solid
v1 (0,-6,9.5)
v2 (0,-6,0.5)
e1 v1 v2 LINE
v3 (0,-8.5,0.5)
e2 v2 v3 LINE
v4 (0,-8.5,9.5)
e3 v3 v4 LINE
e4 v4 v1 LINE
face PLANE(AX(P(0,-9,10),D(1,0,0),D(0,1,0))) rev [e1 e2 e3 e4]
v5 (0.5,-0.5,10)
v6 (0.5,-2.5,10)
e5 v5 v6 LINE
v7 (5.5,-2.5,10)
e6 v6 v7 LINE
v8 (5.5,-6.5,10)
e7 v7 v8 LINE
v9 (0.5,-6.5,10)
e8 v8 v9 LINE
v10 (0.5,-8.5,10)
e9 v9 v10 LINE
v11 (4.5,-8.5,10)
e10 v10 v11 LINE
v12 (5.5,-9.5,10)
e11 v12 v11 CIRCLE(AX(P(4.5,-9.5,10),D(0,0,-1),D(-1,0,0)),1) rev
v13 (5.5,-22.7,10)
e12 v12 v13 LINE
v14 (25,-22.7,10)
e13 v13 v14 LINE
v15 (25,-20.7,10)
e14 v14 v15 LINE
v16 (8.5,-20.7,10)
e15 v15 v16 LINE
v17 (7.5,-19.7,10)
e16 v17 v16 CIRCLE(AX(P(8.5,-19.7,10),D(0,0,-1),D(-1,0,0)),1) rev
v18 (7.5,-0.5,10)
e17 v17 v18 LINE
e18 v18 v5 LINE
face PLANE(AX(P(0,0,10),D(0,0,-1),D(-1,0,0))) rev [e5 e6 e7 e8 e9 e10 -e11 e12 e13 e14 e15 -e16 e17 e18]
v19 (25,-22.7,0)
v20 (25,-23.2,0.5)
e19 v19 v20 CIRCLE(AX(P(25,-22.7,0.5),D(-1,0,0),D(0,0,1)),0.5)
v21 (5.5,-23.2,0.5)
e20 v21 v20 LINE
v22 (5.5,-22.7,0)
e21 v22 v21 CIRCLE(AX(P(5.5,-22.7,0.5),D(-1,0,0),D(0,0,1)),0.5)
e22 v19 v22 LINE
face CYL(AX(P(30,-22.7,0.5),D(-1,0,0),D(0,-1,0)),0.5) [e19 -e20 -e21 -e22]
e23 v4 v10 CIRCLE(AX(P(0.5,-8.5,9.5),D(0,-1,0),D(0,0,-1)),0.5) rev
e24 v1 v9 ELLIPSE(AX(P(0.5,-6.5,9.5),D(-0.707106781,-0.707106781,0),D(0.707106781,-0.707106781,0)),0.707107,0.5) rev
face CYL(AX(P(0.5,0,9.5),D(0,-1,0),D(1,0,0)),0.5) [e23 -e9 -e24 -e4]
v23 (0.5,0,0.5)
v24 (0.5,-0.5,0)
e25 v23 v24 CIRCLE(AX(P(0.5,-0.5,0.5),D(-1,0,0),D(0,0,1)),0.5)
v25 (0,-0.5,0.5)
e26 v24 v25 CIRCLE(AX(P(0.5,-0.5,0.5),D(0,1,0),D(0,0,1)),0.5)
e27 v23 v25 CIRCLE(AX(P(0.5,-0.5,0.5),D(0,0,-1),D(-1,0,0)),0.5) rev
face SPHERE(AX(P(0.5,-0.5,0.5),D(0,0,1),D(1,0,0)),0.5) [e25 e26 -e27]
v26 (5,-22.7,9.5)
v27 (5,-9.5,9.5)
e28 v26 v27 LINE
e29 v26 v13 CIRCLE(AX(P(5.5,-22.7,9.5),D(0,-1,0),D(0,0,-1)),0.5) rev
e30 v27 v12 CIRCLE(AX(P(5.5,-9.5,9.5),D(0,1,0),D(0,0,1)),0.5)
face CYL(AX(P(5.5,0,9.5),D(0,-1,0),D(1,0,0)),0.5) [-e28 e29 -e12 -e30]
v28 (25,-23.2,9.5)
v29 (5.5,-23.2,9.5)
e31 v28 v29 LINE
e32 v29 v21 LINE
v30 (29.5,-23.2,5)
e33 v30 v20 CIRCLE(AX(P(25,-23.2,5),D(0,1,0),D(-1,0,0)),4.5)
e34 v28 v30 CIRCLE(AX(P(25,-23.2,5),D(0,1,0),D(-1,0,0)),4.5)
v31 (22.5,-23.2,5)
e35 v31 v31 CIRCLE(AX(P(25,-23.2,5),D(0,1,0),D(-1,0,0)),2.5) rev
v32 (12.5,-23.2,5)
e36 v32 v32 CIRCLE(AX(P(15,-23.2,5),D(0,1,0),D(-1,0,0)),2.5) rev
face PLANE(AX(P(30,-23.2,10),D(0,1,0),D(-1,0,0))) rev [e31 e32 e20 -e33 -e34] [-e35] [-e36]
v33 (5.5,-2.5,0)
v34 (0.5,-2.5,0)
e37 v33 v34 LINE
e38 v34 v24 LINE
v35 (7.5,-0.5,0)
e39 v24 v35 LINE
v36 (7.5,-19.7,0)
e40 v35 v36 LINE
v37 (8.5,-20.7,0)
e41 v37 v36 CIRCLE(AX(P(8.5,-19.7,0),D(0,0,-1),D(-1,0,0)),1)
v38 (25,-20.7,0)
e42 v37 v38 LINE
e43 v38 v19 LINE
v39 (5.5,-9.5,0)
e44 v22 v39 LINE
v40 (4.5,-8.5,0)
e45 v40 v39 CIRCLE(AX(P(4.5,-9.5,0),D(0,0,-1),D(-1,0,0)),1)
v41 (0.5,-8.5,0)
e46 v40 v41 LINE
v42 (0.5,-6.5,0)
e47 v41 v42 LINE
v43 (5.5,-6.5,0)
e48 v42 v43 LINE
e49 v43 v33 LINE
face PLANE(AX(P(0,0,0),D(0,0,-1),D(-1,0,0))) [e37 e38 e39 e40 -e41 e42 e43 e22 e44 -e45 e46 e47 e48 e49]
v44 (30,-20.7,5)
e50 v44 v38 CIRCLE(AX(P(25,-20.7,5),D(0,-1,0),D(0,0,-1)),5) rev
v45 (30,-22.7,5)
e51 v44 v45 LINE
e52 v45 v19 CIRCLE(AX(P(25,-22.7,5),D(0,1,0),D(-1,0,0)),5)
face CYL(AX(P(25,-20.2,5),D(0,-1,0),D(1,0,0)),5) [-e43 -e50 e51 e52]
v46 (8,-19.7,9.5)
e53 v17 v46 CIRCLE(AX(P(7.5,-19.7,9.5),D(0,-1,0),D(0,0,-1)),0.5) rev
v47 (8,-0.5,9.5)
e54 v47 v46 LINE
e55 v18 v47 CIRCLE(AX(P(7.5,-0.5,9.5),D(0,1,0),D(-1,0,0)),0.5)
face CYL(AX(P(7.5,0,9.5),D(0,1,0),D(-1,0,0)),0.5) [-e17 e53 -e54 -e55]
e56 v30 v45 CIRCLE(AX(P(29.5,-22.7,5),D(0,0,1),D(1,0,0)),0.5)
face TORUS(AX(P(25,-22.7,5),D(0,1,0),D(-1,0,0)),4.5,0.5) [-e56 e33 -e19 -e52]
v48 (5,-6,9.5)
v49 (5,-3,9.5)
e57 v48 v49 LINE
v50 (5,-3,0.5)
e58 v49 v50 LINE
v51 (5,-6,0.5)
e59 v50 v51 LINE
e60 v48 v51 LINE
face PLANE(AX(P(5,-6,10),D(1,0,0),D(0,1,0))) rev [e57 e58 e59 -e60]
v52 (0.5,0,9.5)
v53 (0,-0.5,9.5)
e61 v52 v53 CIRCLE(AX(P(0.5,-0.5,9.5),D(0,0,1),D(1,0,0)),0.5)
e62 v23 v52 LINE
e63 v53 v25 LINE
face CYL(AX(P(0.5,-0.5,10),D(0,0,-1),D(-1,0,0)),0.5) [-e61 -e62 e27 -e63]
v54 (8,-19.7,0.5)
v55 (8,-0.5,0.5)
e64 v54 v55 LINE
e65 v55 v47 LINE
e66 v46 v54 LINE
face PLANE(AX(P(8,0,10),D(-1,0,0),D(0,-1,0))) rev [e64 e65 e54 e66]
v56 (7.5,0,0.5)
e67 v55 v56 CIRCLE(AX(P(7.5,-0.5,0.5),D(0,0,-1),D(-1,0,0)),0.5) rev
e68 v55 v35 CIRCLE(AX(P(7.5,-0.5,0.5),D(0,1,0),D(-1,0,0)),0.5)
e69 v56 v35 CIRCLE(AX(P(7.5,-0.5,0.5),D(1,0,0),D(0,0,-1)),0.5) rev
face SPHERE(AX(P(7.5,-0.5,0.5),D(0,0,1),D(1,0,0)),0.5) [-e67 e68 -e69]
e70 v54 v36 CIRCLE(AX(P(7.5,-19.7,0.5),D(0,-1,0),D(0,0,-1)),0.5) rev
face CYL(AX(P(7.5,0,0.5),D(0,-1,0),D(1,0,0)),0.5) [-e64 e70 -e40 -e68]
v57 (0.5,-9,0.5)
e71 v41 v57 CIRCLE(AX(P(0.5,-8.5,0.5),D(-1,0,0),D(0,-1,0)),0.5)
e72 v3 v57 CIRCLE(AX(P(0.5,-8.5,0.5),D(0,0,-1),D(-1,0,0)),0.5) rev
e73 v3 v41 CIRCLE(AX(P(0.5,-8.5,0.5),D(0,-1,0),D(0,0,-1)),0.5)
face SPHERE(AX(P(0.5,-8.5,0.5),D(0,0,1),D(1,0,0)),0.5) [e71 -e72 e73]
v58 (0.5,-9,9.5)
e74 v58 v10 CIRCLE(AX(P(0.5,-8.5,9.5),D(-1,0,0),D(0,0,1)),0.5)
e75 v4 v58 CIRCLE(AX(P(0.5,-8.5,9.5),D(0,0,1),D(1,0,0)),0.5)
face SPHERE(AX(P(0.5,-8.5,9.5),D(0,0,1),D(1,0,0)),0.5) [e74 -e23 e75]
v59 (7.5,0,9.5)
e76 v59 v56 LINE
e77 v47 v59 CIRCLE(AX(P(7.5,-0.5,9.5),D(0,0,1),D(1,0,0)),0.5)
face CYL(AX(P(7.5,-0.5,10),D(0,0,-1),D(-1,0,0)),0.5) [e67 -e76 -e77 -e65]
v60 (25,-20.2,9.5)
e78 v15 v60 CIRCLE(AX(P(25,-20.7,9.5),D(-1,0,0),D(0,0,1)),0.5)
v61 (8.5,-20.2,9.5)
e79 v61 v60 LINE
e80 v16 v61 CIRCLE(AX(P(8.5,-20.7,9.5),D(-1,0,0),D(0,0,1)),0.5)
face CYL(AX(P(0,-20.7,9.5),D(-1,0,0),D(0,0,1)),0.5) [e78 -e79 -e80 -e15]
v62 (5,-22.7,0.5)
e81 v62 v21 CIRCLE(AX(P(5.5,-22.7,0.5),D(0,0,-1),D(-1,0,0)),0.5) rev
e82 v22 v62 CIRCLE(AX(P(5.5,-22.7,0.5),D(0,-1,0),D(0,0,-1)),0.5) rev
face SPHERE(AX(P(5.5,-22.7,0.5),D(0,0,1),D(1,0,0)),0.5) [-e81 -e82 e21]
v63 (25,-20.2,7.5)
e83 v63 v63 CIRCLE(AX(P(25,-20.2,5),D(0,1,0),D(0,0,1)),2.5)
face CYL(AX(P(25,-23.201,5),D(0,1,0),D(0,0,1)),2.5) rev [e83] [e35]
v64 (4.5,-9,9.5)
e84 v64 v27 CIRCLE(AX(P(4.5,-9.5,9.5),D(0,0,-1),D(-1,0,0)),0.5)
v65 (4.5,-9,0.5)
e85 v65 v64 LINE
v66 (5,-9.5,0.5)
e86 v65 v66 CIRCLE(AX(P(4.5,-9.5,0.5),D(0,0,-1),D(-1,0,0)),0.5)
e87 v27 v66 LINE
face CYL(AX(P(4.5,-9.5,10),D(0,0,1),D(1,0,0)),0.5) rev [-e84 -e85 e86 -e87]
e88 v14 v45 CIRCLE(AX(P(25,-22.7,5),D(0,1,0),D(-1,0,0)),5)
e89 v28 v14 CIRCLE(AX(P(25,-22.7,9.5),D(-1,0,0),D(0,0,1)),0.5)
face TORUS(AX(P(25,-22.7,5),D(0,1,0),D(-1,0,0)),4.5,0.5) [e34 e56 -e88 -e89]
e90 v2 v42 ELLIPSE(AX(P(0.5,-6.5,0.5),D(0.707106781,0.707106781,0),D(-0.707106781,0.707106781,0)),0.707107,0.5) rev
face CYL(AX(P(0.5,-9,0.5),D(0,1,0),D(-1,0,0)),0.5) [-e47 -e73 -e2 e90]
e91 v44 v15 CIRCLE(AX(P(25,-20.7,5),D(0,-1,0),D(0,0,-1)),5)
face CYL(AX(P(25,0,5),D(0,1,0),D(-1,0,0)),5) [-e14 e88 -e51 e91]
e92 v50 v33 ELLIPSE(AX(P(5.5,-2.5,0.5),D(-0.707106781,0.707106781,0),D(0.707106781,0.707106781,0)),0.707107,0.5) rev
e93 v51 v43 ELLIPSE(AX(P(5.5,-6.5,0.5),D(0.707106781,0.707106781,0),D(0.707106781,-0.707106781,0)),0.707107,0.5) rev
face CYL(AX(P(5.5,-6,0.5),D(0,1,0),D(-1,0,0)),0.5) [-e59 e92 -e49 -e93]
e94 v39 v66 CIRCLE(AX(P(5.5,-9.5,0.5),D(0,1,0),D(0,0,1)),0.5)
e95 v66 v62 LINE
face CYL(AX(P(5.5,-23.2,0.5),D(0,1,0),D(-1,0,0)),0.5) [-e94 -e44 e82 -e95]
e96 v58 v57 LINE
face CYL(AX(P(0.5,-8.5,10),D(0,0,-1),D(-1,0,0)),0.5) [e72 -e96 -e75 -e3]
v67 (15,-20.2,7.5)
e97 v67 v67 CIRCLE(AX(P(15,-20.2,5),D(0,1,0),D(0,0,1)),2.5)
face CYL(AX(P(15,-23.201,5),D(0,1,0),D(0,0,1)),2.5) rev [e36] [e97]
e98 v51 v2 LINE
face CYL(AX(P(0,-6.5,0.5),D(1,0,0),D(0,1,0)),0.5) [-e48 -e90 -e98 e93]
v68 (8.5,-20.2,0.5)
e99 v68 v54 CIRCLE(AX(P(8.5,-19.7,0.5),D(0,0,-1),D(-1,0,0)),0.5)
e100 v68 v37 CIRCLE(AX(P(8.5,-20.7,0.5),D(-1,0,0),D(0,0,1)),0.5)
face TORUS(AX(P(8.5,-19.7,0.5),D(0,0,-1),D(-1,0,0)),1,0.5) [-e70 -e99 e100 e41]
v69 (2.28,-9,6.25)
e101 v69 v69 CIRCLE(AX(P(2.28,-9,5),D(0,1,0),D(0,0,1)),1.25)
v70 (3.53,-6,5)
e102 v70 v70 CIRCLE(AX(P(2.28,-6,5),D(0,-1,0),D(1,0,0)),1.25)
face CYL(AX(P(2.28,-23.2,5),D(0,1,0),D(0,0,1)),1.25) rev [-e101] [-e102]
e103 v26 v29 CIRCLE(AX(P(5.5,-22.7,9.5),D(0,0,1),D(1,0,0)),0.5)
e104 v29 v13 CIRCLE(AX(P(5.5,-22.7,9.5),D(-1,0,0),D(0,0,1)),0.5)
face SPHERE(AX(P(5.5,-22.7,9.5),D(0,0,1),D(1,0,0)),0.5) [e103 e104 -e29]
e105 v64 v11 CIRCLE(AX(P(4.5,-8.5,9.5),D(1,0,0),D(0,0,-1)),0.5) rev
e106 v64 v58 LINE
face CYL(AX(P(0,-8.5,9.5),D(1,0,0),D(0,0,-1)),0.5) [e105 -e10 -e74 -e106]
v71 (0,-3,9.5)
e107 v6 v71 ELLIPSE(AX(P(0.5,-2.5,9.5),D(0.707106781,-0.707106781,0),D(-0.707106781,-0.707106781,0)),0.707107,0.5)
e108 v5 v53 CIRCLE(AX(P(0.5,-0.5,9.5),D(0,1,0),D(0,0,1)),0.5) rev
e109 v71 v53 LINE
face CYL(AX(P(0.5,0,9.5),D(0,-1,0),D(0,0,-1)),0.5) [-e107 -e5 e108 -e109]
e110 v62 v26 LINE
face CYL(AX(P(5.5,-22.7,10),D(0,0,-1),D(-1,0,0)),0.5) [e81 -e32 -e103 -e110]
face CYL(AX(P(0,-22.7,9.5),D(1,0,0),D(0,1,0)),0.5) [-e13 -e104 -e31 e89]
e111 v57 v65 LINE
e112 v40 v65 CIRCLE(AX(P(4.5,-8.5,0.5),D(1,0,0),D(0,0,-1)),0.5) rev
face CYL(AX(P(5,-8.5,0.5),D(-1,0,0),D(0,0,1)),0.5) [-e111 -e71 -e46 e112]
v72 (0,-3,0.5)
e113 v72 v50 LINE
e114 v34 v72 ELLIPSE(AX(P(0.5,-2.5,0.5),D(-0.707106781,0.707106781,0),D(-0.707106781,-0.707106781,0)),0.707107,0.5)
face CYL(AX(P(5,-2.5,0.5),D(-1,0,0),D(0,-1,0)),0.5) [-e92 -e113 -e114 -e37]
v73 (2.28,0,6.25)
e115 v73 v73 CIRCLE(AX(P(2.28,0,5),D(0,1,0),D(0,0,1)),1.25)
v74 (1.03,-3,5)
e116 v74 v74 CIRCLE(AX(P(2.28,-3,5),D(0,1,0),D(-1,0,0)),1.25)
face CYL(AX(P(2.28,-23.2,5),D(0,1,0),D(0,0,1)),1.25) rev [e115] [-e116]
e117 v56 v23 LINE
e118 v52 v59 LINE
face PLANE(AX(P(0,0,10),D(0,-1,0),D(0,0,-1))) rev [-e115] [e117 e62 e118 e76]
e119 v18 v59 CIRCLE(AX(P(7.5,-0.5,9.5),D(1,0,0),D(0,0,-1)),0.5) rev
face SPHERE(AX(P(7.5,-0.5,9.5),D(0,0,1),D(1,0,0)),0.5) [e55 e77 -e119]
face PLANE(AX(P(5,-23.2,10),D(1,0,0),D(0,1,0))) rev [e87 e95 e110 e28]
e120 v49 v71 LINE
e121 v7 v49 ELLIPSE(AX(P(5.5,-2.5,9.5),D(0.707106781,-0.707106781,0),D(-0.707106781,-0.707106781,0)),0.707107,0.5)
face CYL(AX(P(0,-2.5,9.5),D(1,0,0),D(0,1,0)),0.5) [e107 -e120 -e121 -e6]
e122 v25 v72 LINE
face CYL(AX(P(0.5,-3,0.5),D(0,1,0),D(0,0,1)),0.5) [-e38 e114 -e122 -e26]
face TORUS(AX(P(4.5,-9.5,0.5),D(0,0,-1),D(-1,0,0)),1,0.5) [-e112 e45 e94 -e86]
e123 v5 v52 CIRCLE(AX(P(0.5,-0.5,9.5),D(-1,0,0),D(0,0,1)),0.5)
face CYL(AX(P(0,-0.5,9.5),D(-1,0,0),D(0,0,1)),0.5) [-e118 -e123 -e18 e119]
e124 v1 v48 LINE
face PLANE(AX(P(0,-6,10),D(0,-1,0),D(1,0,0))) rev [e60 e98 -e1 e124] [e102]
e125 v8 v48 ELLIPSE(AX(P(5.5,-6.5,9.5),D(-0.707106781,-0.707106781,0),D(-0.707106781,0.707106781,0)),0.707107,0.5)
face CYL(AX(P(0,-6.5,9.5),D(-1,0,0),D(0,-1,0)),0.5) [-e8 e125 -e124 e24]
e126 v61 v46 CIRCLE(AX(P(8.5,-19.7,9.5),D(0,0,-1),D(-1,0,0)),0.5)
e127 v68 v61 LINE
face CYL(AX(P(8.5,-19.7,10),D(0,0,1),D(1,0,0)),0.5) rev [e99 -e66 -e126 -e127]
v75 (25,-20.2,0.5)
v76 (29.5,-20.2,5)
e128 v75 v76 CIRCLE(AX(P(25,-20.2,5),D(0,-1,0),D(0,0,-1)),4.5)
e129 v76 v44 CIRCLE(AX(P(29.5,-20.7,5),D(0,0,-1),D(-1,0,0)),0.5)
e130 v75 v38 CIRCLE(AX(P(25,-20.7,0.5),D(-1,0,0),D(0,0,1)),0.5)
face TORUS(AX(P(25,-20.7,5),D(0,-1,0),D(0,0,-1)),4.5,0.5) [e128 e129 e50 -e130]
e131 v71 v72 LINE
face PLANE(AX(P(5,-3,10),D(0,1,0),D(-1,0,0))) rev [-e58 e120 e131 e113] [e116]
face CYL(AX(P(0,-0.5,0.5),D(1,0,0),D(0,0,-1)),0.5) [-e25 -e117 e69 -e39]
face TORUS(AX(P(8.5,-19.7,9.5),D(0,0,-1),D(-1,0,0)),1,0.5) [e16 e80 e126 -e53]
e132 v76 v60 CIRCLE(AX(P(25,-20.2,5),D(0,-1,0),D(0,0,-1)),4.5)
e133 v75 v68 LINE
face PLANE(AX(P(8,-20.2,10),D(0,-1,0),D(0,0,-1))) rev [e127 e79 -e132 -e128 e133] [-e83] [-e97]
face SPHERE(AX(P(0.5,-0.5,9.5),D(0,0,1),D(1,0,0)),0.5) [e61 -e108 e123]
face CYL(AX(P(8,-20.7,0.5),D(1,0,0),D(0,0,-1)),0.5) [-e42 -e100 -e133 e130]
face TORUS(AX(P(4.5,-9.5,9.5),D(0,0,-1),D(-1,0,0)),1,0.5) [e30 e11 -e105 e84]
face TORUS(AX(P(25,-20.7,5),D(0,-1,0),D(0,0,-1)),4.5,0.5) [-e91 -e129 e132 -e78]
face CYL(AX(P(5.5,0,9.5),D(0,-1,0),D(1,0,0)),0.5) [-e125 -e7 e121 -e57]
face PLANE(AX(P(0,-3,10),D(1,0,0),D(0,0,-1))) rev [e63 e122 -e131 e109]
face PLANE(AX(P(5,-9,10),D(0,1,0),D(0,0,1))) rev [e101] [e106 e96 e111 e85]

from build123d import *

# Parameters (mm, degrees)
BOSS_EXTRUDE1_DEPTH = 10
SKETCH2_R           = 1.25
CUT_EXTRUDE1_DEPTH  = 40.220402854
CUT_EXTRUDE2_REACH  = 39.524
SKETCH3_R           = 2.5
FILLET1_R           = 0.5
FILLET2_R           = 5


with BuildPart() as part:
    # Sketch1 → Boss-Extrude1 (new body)
    with BuildSketch(Plane.XY):
        Polygon((0, 0), (8, 0), (8, -20.2), (30, -20.2), (30, -23.2), (5, -23.2), (5, -9), (0, -9), (0, -6), (5, -6), (5, -3), (0, -3), align=None)
    extrude(amount=BOSS_EXTRUDE1_DEPTH)

    # Sketch2 → Cut-Extrude1 (cut, through all)
    with BuildSketch(Plane(origin=(0, 0, 0), x_dir=(1, 0, 0), z_dir=(0, 1, 0))):
        with Locations(Location((2.28, -5, 0), (0, 0, 270))):
            Circle(SKETCH2_R)
    extrude(amount=-CUT_EXTRUDE1_DEPTH, mode=Mode.SUBTRACT)

    # Sketch3 → Cut-Extrude2 (cut, up to next)
    with BuildSketch(Plane(origin=(0, -20.2, 0), x_dir=(1, 0, 0), z_dir=(0, 1, 0)), mode=Mode.PRIVATE) as cut_extrude2_sk1:
        with Locations(Location((25, -5, 0), (0, 0, 270))):
            Circle(SKETCH3_R)
    cut_extrude2_tool1 = extrude(cut_extrude2_sk1.sketch, amount=-CUT_EXTRUDE2_REACH, mode=Mode.PRIVATE) & part.part
    # Sketch3 → Cut-Extrude2 (cut, up to next)
    with BuildSketch(Plane(origin=(0, -20.2, 0), x_dir=(1, 0, 0), z_dir=(0, 1, 0)), mode=Mode.PRIVATE) as cut_extrude2_sk2:
        with Locations(Location((15, -5, 0), (0, 0, 270))):
            Circle(SKETCH3_R)
    cut_extrude2_tool2 = extrude(cut_extrude2_sk2.sketch, amount=-CUT_EXTRUDE2_REACH, mode=Mode.PRIVATE) & part.part
    add(cut_extrude2_tool1.solids().sort_by_distance((25, -20.2, 5))[0], mode=Mode.SUBTRACT)
    add(cut_extrude2_tool2.solids().sort_by_distance((15, -20.2, 5))[0], mode=Mode.SUBTRACT)

    # Fillet1
    fillet1_edges = [part.edges().sort_by_distance(p)[0] for p in [
        (4, 0, 0),
        (8, -10.1, 0),
        (5, -4.5, 10),
        (19, -20.2, 0),
        (17.5, -23.2, 0),
        (5, -16.1, 0),
        (2.5, -9, 0),
        (0, -7.5, 0),
        (2.5, -6, 0),
        (5, -4.5, 0),
        (2.5, -3, 0),
        (0, -1.5, 0),
        (2.5, -6, 10),
        (0, 0, 5),
        (8, 0, 5),
        (8, -20.2, 5),
        (0, -7.5, 10),
        (30, -20.2, 5),
        (30, -23.2, 5),
        (5, -23.2, 5),
        (5, -9, 5),
        (0, -9, 5),
        (2.5, -9, 10),
        (5, -16.1, 10),
        (17.5, -23.2, 10),
        (19, -20.2, 10),
        (8, -10.1, 10),
        (4, 0, 10),
        (0, -1.5, 10),
        (2.5, -3, 10),
    ]]
    fillet(fillet1_edges, radius=FILLET1_R)

    # Fillet2
    # the kernel refuses this fillet: 5 mm, written as the material it takes off along each edge
    with BuildSketch(Plane(origin=(25, -20.2, 5), x_dir=(1, 0, 0), z_dir=(0, 0, 1))) as fillet2_piece_1:
        with BuildLine():
            CenterArc((4.5, -0.5), 0.5, 0, 90)
            Line((5, -0.5), (5, 0))
            Line((5, 0), (4.5, 0))
        make_face()
    revolve(axis=Axis((25, -20.2, 5), (0, 1, 0)), revolution_arc=90, mode=Mode.SUBTRACT)
    with BuildSketch(Plane(origin=(25, -23.2, 5), x_dir=(0, 0, -1), z_dir=(-1, 0, 0))) as fillet2_piece_2:
        with BuildLine():
            CenterArc((4.5, -0.5), 0.5, 0, 90)
            Line((5, -0.5), (5, 0))
            Line((5, 0), (4.5, 0))
        make_face()
    revolve(axis=Axis((25, -23.2, 5), (0, -1, 0)), revolution_arc=90, mode=Mode.SUBTRACT)
    with BuildSketch(Plane(origin=(25, -20.2, 5), x_dir=(0, 0, 1), z_dir=(-1, 0, 0))) as fillet2_piece_3:
        with BuildLine():
            CenterArc((4.5, -0.5), 0.5, 0, 90)
            Line((5, -0.5), (5, 0))
            Line((5, 0), (4.5, 0))
        make_face()
    revolve(axis=Axis((25, -20.2, 5), (0, 1, 0)), revolution_arc=90, mode=Mode.SUBTRACT)
    with BuildSketch(Plane(origin=(25, -23.2, 5), x_dir=(1, 0, 0), z_dir=(0, 0, -1))) as fillet2_piece_4:
        with BuildLine():
            CenterArc((4.5, -0.5), 0.5, 0, 90)
            Line((5, -0.5), (5, 0))
            Line((5, 0), (4.5, 0))
        make_face()
    revolve(axis=Axis((25, -23.2, 5), (0, -1, 0)), revolution_arc=90, mode=Mode.SUBTRACT)
    with BuildSketch(Plane(origin=(30, -20.2, 10), x_dir=(-1, 0, 0), z_dir=(0, -1, 0))) as fillet2_piece_5:
        with BuildLine():
            CenterArc((FILLET2_R, FILLET2_R), FILLET2_R, 180, 90)
            Line((0, FILLET2_R), (0, 0))
            Line((0, 0), (FILLET2_R, 0))
        make_face()
    extrude(amount=3, mode=Mode.SUBTRACT)
    with BuildSketch(Plane(origin=(30, -20.2, 0), x_dir=(-1, 0, 0), z_dir=(0, -1, 0))) as fillet2_piece_6:
        with BuildLine():
            CenterArc((FILLET2_R, -FILLET2_R), FILLET2_R, 90, 90)
            Line((0, -FILLET2_R), (0, 0))
            Line((0, 0), (FILLET2_R, 0))
        make_face()
    extrude(amount=3, mode=Mode.SUBTRACT)


solid = part.part
